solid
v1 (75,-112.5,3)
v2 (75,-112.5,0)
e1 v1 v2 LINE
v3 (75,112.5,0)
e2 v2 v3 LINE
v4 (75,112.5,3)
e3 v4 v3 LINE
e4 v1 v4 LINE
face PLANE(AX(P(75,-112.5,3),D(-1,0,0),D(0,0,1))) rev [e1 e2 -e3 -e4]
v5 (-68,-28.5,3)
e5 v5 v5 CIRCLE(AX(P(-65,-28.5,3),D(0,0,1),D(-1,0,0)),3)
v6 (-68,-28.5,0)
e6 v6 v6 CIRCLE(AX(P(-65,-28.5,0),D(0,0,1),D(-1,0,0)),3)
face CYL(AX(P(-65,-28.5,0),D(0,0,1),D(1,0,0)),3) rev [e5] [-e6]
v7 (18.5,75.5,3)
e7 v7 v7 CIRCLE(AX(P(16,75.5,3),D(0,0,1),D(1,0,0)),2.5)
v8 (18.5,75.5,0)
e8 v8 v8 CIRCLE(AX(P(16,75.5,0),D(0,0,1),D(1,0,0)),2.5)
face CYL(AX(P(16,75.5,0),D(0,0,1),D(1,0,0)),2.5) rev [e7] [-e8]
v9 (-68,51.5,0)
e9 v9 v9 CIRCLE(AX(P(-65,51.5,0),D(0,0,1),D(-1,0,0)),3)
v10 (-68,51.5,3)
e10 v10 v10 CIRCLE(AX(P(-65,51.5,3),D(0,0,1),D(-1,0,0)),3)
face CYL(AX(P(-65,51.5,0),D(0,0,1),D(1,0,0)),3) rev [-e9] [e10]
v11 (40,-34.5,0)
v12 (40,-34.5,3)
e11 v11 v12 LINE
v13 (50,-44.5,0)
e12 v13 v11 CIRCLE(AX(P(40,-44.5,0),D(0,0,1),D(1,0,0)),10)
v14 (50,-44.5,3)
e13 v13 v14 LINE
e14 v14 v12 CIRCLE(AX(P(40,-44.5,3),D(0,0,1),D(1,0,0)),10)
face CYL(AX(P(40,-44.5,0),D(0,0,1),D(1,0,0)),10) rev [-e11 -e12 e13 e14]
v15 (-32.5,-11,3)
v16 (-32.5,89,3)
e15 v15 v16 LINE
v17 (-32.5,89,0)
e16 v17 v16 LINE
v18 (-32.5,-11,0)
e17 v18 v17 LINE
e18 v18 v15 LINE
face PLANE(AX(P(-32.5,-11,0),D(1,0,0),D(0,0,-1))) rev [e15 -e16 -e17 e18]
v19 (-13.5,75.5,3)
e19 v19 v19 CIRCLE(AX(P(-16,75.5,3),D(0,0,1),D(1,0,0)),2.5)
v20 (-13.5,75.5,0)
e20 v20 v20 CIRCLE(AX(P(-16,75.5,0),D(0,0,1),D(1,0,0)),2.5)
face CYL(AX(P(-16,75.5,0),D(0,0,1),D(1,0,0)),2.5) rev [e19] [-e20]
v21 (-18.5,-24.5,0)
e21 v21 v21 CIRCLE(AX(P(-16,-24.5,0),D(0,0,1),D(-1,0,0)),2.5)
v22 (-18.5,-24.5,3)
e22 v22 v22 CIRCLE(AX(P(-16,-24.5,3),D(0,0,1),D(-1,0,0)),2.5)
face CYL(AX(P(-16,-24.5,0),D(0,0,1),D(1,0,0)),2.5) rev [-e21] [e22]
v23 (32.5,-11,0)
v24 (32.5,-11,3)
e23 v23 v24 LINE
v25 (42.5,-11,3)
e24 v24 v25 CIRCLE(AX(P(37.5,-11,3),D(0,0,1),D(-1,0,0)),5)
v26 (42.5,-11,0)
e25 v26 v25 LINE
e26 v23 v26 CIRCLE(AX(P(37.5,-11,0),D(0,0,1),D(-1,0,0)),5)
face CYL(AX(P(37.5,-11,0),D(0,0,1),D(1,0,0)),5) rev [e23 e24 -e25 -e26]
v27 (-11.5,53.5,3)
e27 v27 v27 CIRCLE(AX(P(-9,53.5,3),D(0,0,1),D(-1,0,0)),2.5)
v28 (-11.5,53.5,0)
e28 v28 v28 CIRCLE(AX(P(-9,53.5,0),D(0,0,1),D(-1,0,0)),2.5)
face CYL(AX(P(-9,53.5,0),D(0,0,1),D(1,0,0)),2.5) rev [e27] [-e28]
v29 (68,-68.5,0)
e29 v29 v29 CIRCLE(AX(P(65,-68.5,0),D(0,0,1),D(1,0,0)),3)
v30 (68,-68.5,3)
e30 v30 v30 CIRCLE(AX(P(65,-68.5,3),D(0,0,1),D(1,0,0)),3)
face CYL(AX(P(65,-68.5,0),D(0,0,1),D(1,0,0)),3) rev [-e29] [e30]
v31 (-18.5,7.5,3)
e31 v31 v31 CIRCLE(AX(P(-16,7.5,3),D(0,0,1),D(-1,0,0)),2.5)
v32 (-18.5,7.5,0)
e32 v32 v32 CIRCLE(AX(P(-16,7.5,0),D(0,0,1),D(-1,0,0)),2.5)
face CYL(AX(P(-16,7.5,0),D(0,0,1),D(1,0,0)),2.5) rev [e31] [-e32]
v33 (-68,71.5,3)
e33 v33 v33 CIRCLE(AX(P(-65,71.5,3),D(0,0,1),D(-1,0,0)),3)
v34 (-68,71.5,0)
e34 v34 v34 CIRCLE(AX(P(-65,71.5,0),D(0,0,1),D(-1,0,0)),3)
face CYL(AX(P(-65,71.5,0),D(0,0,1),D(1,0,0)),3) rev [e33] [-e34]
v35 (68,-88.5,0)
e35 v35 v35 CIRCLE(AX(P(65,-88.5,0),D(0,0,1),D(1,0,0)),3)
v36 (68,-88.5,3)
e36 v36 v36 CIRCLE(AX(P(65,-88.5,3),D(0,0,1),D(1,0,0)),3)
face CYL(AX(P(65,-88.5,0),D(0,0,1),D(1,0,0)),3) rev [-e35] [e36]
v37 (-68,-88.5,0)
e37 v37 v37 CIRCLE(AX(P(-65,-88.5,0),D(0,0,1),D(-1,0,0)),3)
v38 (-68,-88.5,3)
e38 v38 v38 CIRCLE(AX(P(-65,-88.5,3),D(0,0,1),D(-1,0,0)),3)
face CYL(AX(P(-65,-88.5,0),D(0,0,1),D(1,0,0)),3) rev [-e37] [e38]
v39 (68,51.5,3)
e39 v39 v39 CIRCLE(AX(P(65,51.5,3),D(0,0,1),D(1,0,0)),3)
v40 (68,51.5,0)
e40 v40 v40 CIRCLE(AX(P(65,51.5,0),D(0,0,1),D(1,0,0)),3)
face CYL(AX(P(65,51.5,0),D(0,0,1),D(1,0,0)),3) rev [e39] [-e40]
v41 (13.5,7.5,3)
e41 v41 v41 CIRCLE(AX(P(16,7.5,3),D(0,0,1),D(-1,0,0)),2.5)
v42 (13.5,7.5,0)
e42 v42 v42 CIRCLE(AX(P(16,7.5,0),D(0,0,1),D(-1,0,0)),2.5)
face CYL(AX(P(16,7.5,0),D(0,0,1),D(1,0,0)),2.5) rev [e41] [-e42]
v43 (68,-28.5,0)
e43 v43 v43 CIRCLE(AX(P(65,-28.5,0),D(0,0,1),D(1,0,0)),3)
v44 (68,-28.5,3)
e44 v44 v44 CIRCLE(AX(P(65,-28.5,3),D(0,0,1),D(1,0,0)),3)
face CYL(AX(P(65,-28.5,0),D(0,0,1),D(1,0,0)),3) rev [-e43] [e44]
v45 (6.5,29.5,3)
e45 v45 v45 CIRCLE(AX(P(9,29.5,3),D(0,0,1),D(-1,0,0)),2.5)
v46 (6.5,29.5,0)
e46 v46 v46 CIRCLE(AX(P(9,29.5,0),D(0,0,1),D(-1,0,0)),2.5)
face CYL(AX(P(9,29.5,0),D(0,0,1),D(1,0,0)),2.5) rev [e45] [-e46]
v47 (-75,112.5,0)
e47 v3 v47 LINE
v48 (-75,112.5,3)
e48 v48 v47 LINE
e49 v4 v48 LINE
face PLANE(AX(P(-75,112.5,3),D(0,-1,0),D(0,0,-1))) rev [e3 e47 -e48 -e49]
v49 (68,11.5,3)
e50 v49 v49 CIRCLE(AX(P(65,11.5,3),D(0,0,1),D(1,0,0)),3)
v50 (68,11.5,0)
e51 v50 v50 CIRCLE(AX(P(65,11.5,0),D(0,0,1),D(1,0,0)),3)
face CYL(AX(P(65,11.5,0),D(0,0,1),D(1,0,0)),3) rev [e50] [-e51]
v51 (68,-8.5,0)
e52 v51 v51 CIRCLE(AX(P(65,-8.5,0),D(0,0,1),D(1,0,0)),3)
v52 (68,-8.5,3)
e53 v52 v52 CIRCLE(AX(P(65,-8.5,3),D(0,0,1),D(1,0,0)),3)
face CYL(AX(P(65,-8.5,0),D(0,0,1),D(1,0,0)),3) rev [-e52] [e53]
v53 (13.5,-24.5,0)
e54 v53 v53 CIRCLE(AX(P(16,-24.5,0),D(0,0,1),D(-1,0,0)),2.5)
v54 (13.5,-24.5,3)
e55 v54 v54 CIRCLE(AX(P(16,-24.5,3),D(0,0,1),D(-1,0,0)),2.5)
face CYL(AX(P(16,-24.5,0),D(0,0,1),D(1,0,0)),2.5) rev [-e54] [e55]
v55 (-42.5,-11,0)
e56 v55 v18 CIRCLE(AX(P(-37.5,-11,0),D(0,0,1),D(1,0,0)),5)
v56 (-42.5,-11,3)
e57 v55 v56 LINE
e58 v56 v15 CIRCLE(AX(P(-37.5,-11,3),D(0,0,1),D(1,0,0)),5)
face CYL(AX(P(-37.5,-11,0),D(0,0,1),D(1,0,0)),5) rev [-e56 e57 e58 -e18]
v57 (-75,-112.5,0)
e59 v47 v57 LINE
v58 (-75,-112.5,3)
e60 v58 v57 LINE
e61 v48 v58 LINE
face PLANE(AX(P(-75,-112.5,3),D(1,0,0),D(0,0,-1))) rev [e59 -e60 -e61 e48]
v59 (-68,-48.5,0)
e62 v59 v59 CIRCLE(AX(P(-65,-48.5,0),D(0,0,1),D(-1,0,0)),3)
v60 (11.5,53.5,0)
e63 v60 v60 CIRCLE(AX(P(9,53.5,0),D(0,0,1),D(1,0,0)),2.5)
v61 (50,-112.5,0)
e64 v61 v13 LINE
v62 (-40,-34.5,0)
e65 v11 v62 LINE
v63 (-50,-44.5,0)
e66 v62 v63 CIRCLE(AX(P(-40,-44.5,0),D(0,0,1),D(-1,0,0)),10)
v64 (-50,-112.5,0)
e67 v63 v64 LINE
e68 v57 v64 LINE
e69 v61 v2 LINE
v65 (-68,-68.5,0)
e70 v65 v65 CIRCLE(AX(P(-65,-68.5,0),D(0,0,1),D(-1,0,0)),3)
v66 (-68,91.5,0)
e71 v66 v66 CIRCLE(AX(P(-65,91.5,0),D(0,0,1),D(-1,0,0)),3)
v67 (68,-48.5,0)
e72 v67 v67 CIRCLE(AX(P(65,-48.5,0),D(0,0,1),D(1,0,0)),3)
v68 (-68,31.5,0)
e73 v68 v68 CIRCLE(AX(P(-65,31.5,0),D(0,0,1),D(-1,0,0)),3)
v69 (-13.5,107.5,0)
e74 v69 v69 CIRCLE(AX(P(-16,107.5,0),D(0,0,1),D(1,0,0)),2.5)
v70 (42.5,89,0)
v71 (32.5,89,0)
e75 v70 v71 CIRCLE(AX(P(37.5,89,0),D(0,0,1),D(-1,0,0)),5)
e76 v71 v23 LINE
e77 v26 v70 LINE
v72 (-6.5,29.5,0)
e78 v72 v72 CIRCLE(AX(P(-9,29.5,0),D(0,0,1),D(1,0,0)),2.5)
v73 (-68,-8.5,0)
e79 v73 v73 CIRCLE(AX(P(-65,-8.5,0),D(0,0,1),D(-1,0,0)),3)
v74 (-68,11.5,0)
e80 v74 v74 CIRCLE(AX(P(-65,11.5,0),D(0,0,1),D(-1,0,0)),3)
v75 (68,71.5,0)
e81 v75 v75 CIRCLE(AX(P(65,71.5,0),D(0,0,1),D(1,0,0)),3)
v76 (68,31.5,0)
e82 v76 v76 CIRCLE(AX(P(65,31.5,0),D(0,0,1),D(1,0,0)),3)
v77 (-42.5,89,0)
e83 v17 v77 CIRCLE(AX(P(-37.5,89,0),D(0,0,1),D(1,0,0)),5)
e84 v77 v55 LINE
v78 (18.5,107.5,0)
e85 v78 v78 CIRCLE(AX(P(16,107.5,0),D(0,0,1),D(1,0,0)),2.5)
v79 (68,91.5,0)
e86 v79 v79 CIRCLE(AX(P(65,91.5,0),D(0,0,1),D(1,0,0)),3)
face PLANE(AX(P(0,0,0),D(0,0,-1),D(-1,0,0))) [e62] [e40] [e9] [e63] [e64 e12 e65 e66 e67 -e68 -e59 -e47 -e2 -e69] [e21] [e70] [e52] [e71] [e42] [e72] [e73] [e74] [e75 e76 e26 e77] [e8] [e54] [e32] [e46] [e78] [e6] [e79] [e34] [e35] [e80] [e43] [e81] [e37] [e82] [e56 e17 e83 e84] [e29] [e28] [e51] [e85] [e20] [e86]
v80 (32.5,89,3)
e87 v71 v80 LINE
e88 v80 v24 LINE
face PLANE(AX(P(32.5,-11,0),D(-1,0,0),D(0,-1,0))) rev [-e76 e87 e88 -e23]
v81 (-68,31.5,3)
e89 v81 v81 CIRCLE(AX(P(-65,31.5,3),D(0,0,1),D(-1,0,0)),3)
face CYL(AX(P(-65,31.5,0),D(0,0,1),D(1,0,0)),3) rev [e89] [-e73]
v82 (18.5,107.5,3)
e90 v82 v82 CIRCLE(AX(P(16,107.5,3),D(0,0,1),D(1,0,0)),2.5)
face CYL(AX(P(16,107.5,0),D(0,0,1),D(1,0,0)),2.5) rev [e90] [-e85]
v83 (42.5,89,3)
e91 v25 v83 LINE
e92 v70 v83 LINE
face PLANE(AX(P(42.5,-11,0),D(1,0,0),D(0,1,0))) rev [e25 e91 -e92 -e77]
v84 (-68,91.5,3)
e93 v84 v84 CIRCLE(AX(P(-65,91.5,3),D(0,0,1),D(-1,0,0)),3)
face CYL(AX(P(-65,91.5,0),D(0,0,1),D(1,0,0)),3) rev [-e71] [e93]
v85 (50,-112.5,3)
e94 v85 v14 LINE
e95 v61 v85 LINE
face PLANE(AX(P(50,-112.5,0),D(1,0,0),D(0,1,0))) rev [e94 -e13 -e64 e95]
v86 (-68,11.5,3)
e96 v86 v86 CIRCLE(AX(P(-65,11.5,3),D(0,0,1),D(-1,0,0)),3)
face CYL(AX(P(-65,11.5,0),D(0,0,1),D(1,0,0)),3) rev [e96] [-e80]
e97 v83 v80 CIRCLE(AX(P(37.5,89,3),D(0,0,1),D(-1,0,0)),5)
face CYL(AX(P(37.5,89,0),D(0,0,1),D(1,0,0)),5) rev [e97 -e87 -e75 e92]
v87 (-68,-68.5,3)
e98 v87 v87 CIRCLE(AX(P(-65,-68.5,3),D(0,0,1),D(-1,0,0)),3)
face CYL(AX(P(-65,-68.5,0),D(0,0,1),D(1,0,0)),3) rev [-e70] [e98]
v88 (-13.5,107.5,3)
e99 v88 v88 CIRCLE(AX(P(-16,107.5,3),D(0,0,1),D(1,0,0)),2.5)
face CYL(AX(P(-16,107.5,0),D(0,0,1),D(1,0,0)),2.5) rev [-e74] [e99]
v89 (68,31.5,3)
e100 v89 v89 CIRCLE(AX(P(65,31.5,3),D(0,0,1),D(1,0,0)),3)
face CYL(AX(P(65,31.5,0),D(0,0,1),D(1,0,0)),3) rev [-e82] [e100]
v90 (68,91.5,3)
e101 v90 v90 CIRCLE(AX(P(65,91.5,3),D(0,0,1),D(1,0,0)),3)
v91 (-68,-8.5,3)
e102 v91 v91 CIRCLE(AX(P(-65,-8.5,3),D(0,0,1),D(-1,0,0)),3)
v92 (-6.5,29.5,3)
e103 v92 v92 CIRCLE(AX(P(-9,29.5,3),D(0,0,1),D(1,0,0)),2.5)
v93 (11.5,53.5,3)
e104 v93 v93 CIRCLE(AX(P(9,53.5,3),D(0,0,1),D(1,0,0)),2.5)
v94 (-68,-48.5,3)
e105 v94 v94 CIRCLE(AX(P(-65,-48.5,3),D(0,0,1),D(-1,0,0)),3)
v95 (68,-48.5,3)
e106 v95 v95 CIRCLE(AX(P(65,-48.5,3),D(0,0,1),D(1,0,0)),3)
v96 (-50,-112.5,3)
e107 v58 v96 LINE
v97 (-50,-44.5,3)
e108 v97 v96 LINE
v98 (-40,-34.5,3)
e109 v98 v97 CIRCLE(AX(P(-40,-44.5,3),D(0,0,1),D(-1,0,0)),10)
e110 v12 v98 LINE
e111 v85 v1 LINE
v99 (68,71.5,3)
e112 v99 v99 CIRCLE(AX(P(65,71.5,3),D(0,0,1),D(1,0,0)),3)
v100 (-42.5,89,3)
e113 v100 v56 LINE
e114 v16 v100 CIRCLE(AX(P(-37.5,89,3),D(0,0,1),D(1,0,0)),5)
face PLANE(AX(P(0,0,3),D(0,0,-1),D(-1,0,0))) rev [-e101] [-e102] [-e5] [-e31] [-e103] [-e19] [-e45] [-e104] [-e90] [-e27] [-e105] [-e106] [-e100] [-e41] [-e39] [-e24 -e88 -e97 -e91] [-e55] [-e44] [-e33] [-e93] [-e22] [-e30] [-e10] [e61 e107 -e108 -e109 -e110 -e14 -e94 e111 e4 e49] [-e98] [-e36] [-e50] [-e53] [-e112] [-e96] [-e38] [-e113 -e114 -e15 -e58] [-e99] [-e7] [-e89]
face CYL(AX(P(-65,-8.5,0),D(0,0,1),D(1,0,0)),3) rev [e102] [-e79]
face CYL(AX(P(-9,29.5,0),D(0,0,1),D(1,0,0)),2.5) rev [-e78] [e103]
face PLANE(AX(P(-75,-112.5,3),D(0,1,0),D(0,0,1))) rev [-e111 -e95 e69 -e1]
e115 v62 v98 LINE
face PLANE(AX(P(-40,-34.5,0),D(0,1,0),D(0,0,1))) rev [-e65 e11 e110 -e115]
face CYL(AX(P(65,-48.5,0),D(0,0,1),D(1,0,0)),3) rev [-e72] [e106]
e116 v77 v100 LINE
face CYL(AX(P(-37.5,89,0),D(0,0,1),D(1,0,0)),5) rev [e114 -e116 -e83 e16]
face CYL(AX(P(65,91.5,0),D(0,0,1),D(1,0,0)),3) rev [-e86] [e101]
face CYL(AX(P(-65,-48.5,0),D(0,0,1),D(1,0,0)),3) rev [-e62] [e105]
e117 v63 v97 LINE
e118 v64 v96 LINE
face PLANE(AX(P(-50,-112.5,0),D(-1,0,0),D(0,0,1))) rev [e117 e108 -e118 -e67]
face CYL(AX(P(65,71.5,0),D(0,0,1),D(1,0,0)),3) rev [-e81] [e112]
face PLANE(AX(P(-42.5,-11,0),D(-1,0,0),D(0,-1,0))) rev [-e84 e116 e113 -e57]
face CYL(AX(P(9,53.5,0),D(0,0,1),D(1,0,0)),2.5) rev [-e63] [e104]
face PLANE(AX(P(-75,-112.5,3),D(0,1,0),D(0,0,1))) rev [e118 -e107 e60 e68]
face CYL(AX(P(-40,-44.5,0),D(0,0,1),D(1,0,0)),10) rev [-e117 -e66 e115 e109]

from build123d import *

# Parameters (mm, degrees)
SKETCH1_W          = 150
SKETCH1_H          = 225
BASE_FLANGE1_DEPTH = 3
SKETCH6_R          = 2.5
SKETCH6_R_2        = 3
CUT_EXTRUDE1_DEPTH = 10
CUT_EXTRUDE2_DEPTH = 10


# Sheet-metal steps are written as plain solids
with BuildPart() as part:
    # Sketch1 → Base-Flange1 (new body)
    with BuildSketch(Plane.XY):
        Rectangle(SKETCH1_W, SKETCH1_H)
    extrude(amount=BASE_FLANGE1_DEPTH)

    # Sketch6 → Cut-Extrude1 (cut)
    with BuildSketch(Plane.XY.offset(3)):
        with Locations((16, 107.5)):
            Circle(SKETCH6_R)
        with Locations((-16, 107.5)):
            Circle(SKETCH6_R)
        with Locations((-16, 75.5)):
            Circle(SKETCH6_R)
        with Locations((16, 75.5)):
            Circle(SKETCH6_R)
        with Locations((9, 53.5)):
            Circle(SKETCH6_R)
        with Locations(Location((16, 7.5, 0), (0, 0, 180))):
            Circle(SKETCH6_R)
        with Locations(Location((16, -24.5, 0), (0, 0, 180))):
            Circle(SKETCH6_R)
        with Locations(Location((-16, 7.5, 0), (0, 0, 180))):
            Circle(SKETCH6_R)
        with Locations(Location((-16, -24.5, 0), (0, 0, 180))):
            Circle(SKETCH6_R)
        with Locations((65, 91.5)):
            Circle(SKETCH6_R_2)
        with Locations((65, 71.5)):
            Circle(SKETCH6_R_2)
        with Locations((65, 51.5)):
            Circle(SKETCH6_R_2)
        with Locations((65, 31.5)):
            Circle(SKETCH6_R_2)
        with Locations((65, 11.5)):
            Circle(SKETCH6_R_2)
        with Locations((65, -8.5)):
            Circle(SKETCH6_R_2)
        with Locations((65, -28.5)):
            Circle(SKETCH6_R_2)
        with Locations((65, -48.5)):
            Circle(SKETCH6_R_2)
        with Locations(Location((-65, -48.5, 0), (0, 0, 180))):
            Circle(SKETCH6_R_2)
        with Locations(Location((-65, -28.5, 0), (0, 0, 180))):
            Circle(SKETCH6_R_2)
        with Locations(Location((-65, -8.5, 0), (0, 0, 180))):
            Circle(SKETCH6_R_2)
        with Locations(Location((-65, 11.5, 0), (0, 0, 180))):
            Circle(SKETCH6_R_2)
        with Locations(Location((-65, 31.5, 0), (0, 0, 180))):
            Circle(SKETCH6_R_2)
        with Locations(Location((-65, 51.5, 0), (0, 0, 180))):
            Circle(SKETCH6_R_2)
        with Locations(Location((-65, 71.5, 0), (0, 0, 180))):
            Circle(SKETCH6_R_2)
        with Locations(Location((-65, 91.5, 0), (0, 0, 180))):
            Circle(SKETCH6_R_2)
        with Locations(Location((9, 29.5, 0), (0, 0, 180))):
            Circle(SKETCH6_R)
        with Locations((-9, 29.5)):
            Circle(SKETCH6_R)
        with Locations(Location((-9, 53.5, 0), (0, 0, 180))):
            Circle(SKETCH6_R)
        with Locations(Location((-65, -68.5, 0), (0, 0, 180))):
            Circle(SKETCH6_R_2)
        with Locations((65, -68.5)):
            Circle(SKETCH6_R_2)
        with Locations(Location((-65, -88.5, 0), (0, 0, 180))):
            Circle(SKETCH6_R_2)
        with Locations((65, -88.5)):
            Circle(SKETCH6_R_2)
    extrude(amount=-CUT_EXTRUDE1_DEPTH, mode=Mode.SUBTRACT)

    # Sketch7 → Cut-Extrude2 (cut)
    with BuildSketch(Plane.XY.offset(3)):
        with BuildLine():
            Line((-50, -112.5), (50, -112.5))
            Line((50, -112.5), (50, -44.5))
            ThreePointArc((50, -44.5), (47.071067812, -37.428932188), (40, -34.5))
            Line((40, -34.5), (-40, -34.5))
            ThreePointArc((-40, -34.5), (-47.071067812, -37.428932188), (-50, -44.5))
            Line((-50, -44.5), (-50, -112.5))
        make_face()
        with BuildLine():
            Line((-42.5, -11), (-42.5, 89))
            ThreePointArc((-42.5, 89), (-37.5, 94), (-32.5, 89))
            Line((-32.5, 89), (-32.5, -11))
            ThreePointArc((-32.5, -11), (-37.5, -16), (-42.5, -11))
        make_face()
        with BuildLine():
            Line((42.5, -11), (42.5, 89))
            ThreePointArc((42.5, 89), (37.5, 94), (32.5, 89))
            Line((32.5, 89), (32.5, -11))
            ThreePointArc((32.5, -11), (37.5, -16), (42.5, -11))
        make_face()
    extrude(amount=-CUT_EXTRUDE2_DEPTH, mode=Mode.SUBTRACT)


solid = part.part
